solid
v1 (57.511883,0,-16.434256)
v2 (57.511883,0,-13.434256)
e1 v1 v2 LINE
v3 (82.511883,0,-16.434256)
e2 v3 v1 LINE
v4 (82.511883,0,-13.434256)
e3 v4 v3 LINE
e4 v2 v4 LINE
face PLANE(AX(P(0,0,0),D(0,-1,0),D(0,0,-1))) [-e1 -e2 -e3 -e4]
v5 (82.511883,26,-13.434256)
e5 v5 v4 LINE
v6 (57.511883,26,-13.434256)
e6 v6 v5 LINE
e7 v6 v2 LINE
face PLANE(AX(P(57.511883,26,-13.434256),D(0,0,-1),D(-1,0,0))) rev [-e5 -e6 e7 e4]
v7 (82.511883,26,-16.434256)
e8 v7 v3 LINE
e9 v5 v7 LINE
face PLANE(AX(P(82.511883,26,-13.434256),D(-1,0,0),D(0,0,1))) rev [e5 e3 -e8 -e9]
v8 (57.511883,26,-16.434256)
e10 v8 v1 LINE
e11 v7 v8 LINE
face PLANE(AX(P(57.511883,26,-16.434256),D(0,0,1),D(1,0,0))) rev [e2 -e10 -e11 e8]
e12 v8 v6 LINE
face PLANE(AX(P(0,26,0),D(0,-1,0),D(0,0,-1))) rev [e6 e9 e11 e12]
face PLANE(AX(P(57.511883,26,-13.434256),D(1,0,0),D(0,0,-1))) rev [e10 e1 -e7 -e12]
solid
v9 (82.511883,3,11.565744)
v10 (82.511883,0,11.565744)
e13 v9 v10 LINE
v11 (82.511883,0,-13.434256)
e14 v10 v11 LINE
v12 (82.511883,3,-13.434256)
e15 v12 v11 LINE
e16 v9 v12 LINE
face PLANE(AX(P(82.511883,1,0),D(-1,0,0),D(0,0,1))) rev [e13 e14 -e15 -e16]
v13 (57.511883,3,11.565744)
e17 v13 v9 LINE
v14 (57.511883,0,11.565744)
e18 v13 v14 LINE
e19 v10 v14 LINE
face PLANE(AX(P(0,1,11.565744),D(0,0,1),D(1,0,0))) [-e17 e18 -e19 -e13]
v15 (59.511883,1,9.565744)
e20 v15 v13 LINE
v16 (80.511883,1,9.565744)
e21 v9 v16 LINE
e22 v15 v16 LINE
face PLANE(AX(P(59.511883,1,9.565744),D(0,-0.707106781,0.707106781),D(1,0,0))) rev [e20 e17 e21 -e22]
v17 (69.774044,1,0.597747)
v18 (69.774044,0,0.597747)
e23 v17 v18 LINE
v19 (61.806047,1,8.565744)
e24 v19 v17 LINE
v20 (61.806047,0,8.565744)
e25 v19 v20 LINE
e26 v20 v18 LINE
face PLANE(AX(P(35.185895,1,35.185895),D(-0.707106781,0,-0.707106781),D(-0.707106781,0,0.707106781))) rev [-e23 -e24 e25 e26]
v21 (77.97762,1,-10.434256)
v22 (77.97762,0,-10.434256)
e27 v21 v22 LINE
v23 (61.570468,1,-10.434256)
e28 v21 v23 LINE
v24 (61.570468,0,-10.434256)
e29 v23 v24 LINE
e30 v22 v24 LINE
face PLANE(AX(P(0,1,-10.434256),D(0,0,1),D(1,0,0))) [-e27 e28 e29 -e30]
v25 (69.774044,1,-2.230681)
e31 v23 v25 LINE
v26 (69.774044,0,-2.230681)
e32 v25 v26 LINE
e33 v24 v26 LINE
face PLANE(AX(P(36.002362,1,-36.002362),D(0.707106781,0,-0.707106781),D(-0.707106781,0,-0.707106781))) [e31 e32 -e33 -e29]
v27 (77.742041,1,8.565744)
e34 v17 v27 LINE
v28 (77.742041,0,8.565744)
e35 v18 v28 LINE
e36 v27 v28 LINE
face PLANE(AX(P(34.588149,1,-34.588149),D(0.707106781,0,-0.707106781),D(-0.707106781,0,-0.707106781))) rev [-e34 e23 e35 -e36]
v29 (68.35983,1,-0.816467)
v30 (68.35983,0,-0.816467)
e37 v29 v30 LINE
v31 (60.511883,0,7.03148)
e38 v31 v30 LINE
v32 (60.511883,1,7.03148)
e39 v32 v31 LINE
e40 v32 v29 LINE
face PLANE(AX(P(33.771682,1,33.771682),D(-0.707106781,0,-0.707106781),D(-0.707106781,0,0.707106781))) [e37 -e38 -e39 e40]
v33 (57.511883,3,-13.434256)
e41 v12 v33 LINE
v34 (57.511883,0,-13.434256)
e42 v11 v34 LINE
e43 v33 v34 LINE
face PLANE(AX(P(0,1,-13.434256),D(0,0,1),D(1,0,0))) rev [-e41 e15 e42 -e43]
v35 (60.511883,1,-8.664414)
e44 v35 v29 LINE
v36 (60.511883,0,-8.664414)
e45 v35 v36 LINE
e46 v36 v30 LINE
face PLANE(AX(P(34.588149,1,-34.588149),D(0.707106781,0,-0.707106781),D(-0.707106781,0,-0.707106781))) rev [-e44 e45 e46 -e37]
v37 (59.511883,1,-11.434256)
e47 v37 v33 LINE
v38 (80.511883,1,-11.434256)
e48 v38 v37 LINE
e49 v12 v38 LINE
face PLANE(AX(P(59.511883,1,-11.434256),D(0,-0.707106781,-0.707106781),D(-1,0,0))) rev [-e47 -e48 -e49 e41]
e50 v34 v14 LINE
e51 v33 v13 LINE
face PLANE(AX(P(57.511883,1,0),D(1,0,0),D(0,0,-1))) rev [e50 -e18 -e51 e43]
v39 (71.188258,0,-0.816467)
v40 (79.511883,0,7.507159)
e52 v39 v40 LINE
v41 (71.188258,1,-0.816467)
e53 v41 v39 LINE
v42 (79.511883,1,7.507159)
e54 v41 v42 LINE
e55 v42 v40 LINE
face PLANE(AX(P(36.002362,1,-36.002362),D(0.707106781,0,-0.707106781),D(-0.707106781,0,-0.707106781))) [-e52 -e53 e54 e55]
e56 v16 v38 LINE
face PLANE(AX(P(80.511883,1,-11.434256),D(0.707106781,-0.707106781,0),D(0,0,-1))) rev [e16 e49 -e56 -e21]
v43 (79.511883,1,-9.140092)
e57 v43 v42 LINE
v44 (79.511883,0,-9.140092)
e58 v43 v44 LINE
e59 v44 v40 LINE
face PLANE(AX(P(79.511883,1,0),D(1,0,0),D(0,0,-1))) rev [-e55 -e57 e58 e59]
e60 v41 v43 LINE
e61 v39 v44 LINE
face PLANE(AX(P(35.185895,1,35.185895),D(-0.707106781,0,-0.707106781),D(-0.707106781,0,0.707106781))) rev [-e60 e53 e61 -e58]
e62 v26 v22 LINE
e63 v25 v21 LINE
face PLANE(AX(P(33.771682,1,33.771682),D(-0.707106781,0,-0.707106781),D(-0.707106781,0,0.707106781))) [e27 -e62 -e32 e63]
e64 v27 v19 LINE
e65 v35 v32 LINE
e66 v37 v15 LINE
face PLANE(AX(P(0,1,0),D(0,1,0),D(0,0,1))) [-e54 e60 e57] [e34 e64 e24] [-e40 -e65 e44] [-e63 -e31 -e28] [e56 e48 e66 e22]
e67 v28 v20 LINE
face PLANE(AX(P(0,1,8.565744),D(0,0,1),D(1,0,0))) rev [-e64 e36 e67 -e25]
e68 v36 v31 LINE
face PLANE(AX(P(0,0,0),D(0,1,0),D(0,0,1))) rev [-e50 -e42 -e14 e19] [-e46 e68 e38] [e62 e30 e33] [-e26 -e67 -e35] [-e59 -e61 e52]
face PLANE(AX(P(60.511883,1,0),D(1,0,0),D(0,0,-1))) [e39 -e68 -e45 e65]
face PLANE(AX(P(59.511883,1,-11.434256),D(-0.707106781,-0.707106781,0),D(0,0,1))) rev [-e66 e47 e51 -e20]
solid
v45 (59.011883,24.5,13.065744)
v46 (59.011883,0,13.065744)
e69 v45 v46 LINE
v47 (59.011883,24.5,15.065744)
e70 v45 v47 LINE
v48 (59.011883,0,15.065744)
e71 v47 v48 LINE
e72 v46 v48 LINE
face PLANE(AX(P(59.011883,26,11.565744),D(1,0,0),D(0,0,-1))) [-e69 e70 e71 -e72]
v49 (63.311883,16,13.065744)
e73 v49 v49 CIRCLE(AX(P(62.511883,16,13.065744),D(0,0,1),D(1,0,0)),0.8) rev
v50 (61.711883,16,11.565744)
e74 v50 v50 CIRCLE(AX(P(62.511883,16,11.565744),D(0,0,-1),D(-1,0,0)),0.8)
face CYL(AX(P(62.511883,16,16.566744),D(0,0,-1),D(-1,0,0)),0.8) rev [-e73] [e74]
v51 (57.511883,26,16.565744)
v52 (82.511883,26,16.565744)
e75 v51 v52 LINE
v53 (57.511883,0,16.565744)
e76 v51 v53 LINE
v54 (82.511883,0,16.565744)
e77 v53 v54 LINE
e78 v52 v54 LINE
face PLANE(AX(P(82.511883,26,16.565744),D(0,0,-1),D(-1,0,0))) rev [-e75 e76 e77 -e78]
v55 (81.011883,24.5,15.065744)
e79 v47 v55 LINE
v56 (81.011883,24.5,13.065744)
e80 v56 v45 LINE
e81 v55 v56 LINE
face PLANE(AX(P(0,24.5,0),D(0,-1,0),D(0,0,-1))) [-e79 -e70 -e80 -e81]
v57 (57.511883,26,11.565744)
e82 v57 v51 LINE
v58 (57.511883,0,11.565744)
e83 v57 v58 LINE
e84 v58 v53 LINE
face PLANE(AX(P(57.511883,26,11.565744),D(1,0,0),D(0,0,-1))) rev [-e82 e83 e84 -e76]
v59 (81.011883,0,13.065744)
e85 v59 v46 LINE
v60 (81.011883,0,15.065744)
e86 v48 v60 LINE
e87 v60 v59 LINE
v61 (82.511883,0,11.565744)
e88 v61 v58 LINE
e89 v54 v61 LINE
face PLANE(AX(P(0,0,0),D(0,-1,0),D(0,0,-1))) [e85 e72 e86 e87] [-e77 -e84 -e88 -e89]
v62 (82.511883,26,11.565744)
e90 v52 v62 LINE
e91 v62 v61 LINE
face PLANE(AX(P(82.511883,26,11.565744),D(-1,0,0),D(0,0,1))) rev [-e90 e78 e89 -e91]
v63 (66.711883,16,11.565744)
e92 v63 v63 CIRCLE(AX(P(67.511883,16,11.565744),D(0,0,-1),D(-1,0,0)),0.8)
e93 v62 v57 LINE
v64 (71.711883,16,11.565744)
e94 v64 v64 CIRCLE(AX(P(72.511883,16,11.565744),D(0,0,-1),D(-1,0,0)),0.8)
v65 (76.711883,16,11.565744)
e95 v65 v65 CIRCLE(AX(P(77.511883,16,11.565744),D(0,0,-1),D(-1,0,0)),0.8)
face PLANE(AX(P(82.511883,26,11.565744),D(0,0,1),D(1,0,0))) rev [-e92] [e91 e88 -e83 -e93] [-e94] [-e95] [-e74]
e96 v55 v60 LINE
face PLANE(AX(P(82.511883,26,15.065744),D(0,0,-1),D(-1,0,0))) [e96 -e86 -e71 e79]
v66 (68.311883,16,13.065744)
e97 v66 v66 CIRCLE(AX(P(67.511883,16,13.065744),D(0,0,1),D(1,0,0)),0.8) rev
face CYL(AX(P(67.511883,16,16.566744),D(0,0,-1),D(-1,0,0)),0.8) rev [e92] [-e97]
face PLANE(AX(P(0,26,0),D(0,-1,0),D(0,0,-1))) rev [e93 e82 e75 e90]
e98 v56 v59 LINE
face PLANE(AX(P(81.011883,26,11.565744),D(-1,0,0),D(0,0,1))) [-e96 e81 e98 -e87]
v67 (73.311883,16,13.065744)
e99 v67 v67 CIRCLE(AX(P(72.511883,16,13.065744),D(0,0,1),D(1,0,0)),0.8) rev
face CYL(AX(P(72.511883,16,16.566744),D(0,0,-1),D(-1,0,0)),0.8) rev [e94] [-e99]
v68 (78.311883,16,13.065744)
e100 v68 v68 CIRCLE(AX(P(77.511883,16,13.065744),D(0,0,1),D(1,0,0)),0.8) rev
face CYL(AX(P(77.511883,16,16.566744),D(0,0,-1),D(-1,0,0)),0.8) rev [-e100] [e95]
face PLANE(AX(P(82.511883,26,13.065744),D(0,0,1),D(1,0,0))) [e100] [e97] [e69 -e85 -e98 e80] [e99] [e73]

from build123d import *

# Parameters (mm, degrees)
SKIZZE1_W                         = 25
SKIZZE1_H                         = 25
AUFSATZ_LINEAR_AUSTRAGEN1_DEPTH   = 1
SKIZZE2_W                         = 25
SKIZZE2_H                         = 25
SKIZZE2_W_2                       = 21
SKIZZE2_H_2                       = 21
AUFSATZ_LINEAR_AUSTRAGEN2_DEPTH   = 2
FASE1_SIZE                        = 2
SKIZZE3_W                         = 25
SKIZZE3_H                         = 5
AUFSATZ_LINEAR_AUSTRAGEN3_DEPTH   = 26
SKIZZE3_H_2                       = 3
AUFSATZ_LINEAR_AUSTRAGEN3_2_DEPTH = 26
WANDUNG1_T                        = -1.5
SKIZZE4_R                         = 0.8
SCHNITT_LINEAR_AUSTRAGEN1_DEPTH   = 1.5


with BuildPart() as part:
    # Skizze1 → Aufsatz-Linear austragen1 (new body)
    with BuildSketch(Plane(origin=(0, 0, 0), x_dir=(1, 0, 0), z_dir=(0, 1, 0))):
        with Locations((70.01188303, 0.934256055)):
            Rectangle(SKIZZE1_W, SKIZZE1_H)
        Polygon((69.774043995, 2.230680518), (77.977619533, 10.434256055), (61.570468458, 10.434256055), align=None, mode=Mode.SUBTRACT)
        Polygon((60.51188303, -7.031480447), (68.359830433, 0.816466956), (60.51188303, 8.664414358), align=None, mode=Mode.SUBTRACT)
        Polygon((61.806046657, -8.565743945), (69.774043995, -0.597746607), (77.742041333, -8.565743945), align=None, mode=Mode.SUBTRACT)
        Polygon((71.188257558, 0.816466956), (79.51188303, -7.507158517), (79.51188303, 9.140092428), align=None, mode=Mode.SUBTRACT)
    extrude(amount=AUFSATZ_LINEAR_AUSTRAGEN1_DEPTH)

    # Skizze2 → Aufsatz-Linear austragen2 (add)
    with BuildSketch(Plane(origin=(0, 1, 0), x_dir=(1, 0, 0), z_dir=(0, 1, 0))):
        with Locations((70.01188303, 0.934256055)):
            Rectangle(SKIZZE2_W, SKIZZE2_H)
        with Locations((70.01188303, 0.934256055)):
            Rectangle(SKIZZE2_W_2, SKIZZE2_H_2, mode=Mode.SUBTRACT)
    extrude(amount=AUFSATZ_LINEAR_AUSTRAGEN2_DEPTH)

    # Fase1
    fase1_edges = [part.edges().sort_by_distance(p)[0] for p in [
        (70.01188303, 3, 9.565743945),
        (80.51188303, 3, -0.934256055),
        (59.51188303, 3, -0.934256055),
        (70.01188303, 3, -11.434256055),
    ]]
    chamfer(fase1_edges, length=FASE1_SIZE - 0.0001)  # a hair under: the kernel refuses the full size


with BuildPart() as body_2:
    # Skizze3 → Aufsatz-Linear austragen3 (new body)
    with BuildSketch(Plane(origin=(0, 0, 0), x_dir=(1, 0, 0), z_dir=(0, 1, 0))):
        with Locations((70.01188303, -14.065743945)):
            Rectangle(SKIZZE3_W, SKIZZE3_H)
    extrude(amount=AUFSATZ_LINEAR_AUSTRAGEN3_DEPTH)

    # Wandung1
    wandung1_openings = [body_2.faces().sort_by_distance(p)[0] for p in [
        (70.01188303, 0, 14.065743945),
    ]]
    offset(amount=WANDUNG1_T, openings=wandung1_openings, kind=Kind.INTERSECTION)

    # Skizze4 → Schnitt-Linear austragen1 (cut)
    with BuildSketch(Plane(origin=(0, 0, 11.565743945), x_dir=(-1, 0, 0), z_dir=(0, 0, -1))):
        with Locations((-62.51188303, 16)):
            Circle(SKIZZE4_R)
        with Locations((-67.51188303, 16)):
            Circle(SKIZZE4_R)
        with Locations((-72.51188303, 16)):
            Circle(SKIZZE4_R)
        with Locations((-77.51188303, 16)):
            Circle(SKIZZE4_R)
    extrude(amount=-SCHNITT_LINEAR_AUSTRAGEN1_DEPTH, mode=Mode.SUBTRACT)


with BuildPart() as body_3:
    # Skizze3 → Aufsatz-Linear austragen3 2 (new body)
    with BuildSketch(Plane(origin=(0, 0, 0), x_dir=(1, 0, 0), z_dir=(0, 1, 0))):
        with Locations((70.01188303, 14.934256055)):
            Rectangle(SKIZZE3_W, SKIZZE3_H_2)
    extrude(amount=AUFSATZ_LINEAR_AUSTRAGEN3_2_DEPTH)


solid = Compound([part.part, body_2.part, body_3.part])
